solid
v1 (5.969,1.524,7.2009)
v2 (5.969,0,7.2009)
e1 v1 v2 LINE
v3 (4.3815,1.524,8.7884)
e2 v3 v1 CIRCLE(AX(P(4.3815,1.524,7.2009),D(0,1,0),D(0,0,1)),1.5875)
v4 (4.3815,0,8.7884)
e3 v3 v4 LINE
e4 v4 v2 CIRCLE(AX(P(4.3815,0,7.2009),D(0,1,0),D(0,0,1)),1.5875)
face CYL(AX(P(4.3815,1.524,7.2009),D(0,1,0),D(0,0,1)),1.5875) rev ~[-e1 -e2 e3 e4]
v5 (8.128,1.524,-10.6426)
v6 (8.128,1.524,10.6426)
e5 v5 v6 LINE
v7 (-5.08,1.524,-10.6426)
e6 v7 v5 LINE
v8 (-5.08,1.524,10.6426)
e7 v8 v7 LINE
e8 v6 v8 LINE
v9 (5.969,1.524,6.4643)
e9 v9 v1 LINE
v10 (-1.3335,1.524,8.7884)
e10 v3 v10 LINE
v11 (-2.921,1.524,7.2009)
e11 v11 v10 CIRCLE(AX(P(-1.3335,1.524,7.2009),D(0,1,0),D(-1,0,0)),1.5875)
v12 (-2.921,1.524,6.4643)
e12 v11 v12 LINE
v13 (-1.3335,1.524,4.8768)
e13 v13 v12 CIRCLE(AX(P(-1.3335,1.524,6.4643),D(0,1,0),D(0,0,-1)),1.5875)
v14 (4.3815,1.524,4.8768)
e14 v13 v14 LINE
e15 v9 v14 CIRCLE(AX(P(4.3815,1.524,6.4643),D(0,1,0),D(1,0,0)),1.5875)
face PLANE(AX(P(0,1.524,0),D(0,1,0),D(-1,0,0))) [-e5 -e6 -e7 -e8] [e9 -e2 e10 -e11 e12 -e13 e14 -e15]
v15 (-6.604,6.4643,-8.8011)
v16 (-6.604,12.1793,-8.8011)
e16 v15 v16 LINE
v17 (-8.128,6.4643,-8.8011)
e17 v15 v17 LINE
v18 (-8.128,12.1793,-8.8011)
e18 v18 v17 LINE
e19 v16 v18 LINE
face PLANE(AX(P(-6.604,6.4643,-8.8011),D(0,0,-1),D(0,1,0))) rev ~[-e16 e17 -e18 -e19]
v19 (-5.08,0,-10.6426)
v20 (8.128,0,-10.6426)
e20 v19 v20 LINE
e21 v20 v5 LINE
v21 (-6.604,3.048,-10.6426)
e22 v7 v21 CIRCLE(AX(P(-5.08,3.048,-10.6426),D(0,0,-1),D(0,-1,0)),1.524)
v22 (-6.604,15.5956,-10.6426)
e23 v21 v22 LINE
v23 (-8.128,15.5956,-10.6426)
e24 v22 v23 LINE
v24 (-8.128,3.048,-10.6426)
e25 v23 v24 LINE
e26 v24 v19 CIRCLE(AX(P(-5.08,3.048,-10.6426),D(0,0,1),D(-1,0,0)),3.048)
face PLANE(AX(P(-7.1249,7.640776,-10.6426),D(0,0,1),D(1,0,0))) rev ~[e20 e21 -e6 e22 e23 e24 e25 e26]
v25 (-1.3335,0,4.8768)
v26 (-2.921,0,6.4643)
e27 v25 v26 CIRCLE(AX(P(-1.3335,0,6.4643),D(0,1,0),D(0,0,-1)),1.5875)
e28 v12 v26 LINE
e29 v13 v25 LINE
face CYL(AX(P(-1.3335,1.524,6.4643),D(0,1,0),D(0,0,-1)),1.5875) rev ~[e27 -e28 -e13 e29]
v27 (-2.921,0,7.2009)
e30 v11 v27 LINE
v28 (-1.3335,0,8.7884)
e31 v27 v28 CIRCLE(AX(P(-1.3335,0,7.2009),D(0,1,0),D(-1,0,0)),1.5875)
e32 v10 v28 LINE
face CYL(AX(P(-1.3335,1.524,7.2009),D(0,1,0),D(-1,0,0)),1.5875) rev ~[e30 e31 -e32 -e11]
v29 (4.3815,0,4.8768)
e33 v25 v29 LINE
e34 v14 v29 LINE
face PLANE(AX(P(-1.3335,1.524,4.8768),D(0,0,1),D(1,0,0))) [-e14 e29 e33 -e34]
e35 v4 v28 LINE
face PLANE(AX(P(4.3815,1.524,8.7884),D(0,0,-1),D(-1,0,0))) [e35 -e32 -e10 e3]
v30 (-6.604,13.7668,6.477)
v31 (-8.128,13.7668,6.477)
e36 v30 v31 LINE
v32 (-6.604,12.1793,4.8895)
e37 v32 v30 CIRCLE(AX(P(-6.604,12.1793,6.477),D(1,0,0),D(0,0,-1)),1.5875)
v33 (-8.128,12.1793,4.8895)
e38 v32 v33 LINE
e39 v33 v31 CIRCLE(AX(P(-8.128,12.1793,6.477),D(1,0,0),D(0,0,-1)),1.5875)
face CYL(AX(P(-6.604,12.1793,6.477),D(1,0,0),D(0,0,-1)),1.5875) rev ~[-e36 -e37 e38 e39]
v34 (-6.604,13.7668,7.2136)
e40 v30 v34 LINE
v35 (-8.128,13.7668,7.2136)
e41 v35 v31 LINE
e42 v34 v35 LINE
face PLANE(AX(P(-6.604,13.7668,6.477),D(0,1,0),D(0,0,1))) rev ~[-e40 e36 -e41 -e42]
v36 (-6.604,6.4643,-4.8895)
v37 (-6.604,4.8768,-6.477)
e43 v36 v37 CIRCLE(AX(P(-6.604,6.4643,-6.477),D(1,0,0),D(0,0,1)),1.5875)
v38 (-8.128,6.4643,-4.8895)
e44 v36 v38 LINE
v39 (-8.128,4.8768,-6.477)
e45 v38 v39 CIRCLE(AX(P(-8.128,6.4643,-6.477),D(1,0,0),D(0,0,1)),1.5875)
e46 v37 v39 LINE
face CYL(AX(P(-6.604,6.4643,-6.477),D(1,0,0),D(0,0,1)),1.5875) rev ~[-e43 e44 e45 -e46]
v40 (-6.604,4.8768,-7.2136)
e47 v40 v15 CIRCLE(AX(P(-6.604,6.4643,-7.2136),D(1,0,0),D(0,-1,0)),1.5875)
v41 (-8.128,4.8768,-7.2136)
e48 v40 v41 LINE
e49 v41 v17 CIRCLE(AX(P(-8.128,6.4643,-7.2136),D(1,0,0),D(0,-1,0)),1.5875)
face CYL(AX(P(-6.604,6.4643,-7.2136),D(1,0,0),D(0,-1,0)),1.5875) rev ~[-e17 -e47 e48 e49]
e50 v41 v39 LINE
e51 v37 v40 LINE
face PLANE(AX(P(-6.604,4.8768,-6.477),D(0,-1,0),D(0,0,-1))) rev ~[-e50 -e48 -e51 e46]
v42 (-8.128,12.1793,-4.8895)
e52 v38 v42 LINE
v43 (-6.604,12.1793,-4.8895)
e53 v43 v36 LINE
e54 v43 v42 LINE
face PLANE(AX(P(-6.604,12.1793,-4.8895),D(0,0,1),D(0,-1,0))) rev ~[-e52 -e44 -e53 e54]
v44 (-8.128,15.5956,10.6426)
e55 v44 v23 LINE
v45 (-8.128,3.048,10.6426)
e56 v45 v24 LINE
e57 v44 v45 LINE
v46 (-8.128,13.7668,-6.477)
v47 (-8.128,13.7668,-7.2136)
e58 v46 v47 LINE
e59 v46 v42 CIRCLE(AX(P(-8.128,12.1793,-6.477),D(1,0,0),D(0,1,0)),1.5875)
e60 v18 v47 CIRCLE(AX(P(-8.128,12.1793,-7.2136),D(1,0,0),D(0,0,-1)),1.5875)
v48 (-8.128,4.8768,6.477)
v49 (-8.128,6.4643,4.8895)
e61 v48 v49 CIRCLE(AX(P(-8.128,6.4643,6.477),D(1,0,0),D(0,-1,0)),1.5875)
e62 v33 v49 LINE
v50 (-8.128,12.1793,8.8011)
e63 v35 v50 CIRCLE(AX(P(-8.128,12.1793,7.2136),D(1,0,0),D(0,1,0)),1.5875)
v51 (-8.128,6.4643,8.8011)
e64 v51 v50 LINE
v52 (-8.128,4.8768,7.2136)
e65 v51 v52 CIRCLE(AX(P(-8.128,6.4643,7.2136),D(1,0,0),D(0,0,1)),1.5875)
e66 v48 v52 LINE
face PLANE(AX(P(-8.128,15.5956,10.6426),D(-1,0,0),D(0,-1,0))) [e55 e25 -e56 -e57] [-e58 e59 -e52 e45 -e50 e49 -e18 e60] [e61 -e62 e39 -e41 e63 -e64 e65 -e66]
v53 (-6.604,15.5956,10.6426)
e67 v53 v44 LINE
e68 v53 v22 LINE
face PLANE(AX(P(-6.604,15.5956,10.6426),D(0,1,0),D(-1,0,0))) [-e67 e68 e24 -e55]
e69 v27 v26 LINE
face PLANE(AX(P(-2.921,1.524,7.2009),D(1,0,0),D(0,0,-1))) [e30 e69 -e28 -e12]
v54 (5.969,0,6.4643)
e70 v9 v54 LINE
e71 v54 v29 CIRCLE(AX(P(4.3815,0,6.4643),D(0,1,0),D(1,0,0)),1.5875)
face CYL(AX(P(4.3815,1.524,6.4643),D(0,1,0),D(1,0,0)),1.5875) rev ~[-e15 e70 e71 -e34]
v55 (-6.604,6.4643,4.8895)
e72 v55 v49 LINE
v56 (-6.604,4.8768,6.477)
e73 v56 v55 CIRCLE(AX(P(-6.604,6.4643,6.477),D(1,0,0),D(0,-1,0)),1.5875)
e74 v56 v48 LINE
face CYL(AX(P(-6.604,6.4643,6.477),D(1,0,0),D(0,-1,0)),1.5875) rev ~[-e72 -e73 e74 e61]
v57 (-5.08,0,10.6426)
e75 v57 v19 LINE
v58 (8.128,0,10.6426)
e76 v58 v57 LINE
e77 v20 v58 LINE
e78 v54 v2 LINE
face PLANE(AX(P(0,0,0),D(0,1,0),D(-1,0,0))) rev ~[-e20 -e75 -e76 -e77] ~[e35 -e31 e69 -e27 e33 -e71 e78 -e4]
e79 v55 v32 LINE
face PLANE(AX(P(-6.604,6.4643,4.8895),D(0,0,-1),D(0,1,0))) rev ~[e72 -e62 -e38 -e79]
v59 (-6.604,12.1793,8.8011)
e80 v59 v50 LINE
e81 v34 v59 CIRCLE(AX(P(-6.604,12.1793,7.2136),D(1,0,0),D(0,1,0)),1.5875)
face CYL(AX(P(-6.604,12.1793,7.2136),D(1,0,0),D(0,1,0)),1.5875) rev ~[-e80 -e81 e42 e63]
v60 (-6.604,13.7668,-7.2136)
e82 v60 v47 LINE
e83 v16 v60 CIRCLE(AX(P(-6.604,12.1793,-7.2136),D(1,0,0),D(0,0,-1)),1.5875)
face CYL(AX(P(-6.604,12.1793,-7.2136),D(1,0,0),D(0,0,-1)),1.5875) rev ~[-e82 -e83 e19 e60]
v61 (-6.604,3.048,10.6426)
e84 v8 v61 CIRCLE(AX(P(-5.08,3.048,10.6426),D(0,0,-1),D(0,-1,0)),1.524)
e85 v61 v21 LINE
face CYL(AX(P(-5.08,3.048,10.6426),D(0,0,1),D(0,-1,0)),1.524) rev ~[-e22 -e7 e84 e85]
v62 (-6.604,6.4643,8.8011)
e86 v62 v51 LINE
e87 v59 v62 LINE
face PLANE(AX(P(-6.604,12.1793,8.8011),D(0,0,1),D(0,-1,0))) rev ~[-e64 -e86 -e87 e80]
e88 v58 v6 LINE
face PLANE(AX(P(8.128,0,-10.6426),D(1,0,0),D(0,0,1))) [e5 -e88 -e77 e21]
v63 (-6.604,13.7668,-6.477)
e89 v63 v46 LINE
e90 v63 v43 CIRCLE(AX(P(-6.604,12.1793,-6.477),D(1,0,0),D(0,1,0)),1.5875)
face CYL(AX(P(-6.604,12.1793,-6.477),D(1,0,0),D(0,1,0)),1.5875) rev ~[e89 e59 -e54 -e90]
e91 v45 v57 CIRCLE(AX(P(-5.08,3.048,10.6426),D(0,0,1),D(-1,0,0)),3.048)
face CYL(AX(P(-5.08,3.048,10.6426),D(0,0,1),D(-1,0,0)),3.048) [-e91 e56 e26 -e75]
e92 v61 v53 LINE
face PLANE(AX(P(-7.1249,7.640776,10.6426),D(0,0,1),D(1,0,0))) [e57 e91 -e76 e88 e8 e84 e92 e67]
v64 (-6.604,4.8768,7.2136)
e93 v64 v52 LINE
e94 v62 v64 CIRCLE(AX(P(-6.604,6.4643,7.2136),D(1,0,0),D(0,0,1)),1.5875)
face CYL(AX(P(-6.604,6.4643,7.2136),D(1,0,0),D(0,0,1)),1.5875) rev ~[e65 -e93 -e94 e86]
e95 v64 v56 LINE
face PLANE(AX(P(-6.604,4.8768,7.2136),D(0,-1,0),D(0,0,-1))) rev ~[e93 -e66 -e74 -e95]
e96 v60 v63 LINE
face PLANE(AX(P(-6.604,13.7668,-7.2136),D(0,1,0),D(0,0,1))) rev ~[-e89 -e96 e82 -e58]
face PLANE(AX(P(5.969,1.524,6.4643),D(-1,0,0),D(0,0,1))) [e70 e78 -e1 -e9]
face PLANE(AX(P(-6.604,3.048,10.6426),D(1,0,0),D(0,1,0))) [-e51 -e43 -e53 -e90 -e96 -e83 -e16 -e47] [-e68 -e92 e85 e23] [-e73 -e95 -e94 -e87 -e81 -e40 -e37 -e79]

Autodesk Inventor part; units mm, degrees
ref_plane "YZ Plane" through (0, 0, 0) normal (1, 0, 0) x (0, 1, 0)
ref_plane "XZ Plane" through (0, 0, 0) normal (0, 1, 0) x (-1, 0, 0)
ref_plane "XY Plane" through (0, 0, 0) normal (0, 0, 1) x (1, 0, 0)
sketch "Sketch1" plane through (0, 0, 0) normal (0, 1, 0) x (-1, 0, 0)
  line L0 (-8.128, 10.6426) -> (8.128, 10.6426)
  line L1 (8.128, 10.6426) -> (8.128, -10.6426)
  line L2 (8.128, -10.6426) -> (-8.128, -10.6426)
  line L3 (-8.128, -10.6426) -> (-8.128, 10.6426)
  line L4 (-8.128, 10.6426) -> (8.128, -10.6426) construction
  line L5 (8.128, 10.6426) -> (-8.128, -10.6426) construction
  point P0 (0, 0)
  dimension "d0" = 21.2852
  dimension "d1" = 16.256
extrude "Plate1" add sketch "Sketch1" along normal blind 1.524
sketch "Sketch2" plane through (-6.604, 0, 10.6426) normal (-1, 0, 0) x (0, -1, 0)
  line L0 (0, -21.2852) -> (0, 0)
  line L1 (0, 0) -> (-15.5956, 0)
  line L2 (-15.5956, 0) -> (-15.5956, -21.2852)
  line L3 (-15.5956, -21.2852) -> (0, -21.2852)
edge flange "Flange1" height 15.5956 angle 90 thickness 1.524 bend radius 1.524 thickness toward (-1, 0, 0) relief tear relief width 1.524 relief depth 0.762 edges at (-8.128, 1.524, 0) wall of the first edge with corners at (-6.604, 0, -10.6426) (-6.604, 0, 10.6426) (-6.604, 15.5956, 10.6426) (-6.604, 15.5956, -10.6426)
bend "Bend1"
corner "Corner1"
sketch "Sketch3" plane through (-6.604, 15.5956, 10.6426) normal (1, 0, 0) x (0, 0, -1)
  line L0 (0, 0) -> (0, -12.5476) construction
  line L1 (21.2852, -12.5476) -> (21.2852, 0) construction
  circle A0 centre (3.7973, -6.2738) radius 1.5875 construction
  circle A1 centre (17.4879, -6.2738) radius 1.5875 construction
  line L2 (3.7973, -6.2738) -> (17.4879, -6.2738) construction
  line L3 (21.2852, 0) -> (0, 0) construction
  line L4 (10.6426, 0) -> (10.6426, -12.5476) construction
  line L5 (0, -12.5476) -> (21.2852, -12.5476) construction
  line L6 (17.1196, -10.7188) -> (17.8562, -10.7188)
  line L7 (19.4437, -9.1313) -> (19.4437, -3.4163)
  line L8 (17.8562, -1.8288) -> (17.1196, -1.8288)
  line L9 (15.5321, -3.4163) -> (15.5321, -9.1313)
  line L10 (15.5321, -10.7188) -> (19.4437, -1.8288) construction
  line L11 (19.4437, -10.7188) -> (15.5321, -1.8288) construction
  arc A2 (17.1196, -1.8288) -> (15.5321, -3.4163) centre (17.1196, -3.4163) ccw
  arc A3 (19.4437, -3.4163) -> (17.8562, -1.8288) centre (17.8562, -3.4163) ccw
  arc A4 (15.5321, -9.1313) -> (17.1196, -10.7188) centre (17.1196, -9.1313) ccw
  arc A5 (17.8562, -10.7188) -> (19.4437, -9.1313) centre (17.8562, -9.1313) ccw
  line L12 (3.429, -10.7188) -> (4.1656, -10.7188)
  line L13 (5.7531, -9.1313) -> (5.7531, -3.4163)
  line L14 (4.1656, -1.8288) -> (3.429, -1.8288)
  line L15 (1.8415, -3.4163) -> (1.8415, -9.1313)
  line L16 (1.8415, -10.7188) -> (5.7531, -1.8288) construction
  line L17 (5.7531, -10.7188) -> (1.8415, -1.8288) construction
  arc A6 (3.429, -1.8288) -> (1.8415, -3.4163) centre (3.429, -3.4163) ccw
  arc A7 (5.7531, -3.4163) -> (4.1656, -1.8288) centre (4.1656, -3.4163) ccw
  arc A8 (4.1656, -10.7188) -> (5.7531, -9.1313) centre (4.1656, -9.1313) ccw
  arc A9 (1.8415, -9.1313) -> (3.429, -10.7188) centre (3.429, -9.1313) ccw
  point P0 (10.6426, -15.5956)
  point P1 (10.6426, -6.2738)
  dimension "d13" = 13.6906
  dimension "d14" = 3.175
  dimension "d15" = 3.175
  dimension "d16" = 3.9116
  dimension "d17" = 8.89
  dimension "d18" = 1.5875
  dimension "d19" = 3.9116
  dimension "d20" = 8.89
  dimension "d21" = 1.5875
sketch "Sketch4" plane through (0, 1.524, 0) normal (0, 1, 0) x (1, 0, 0)
  line L0 (-5.08, 10.6426) -> (8.128, 10.6426) construction
  line L1 (4.3815, 4.8768) -> (-1.3335, 4.8768) construction
  line L2 (-2.921, 6.4643) -> (-2.921, 7.2009) construction
  line L3 (-1.3335, 8.7884) -> (4.3815, 8.7884) construction
  line L4 (5.969, 7.2009) -> (5.969, 6.4643) construction
  arc A0 (-2.921, 6.4643) -> (-1.3335, 4.8768) centre (-1.3335, 6.4643) ccw construction
  arc A1 (-1.3335, 8.7884) -> (-2.921, 7.2009) centre (-1.3335, 7.2009) ccw construction
  arc A2 (4.3815, 4.8768) -> (5.969, 6.4643) centre (4.3815, 6.4643) ccw construction
  arc A3 (5.969, 7.2009) -> (4.3815, 8.7884) centre (4.3815, 7.2009) ccw construction
  line L5 (8.128, 10.6426) -> (8.128, -10.6426) projected
  line L6 (1.524, 4.8768) -> (1.524, 8.7884) construction
  line L7 (4.3815, -8.7884) -> (-1.3335, -8.7884)
  line L8 (-2.921, -7.2009) -> (-2.921, -6.4643)
  line L9 (-1.3335, -4.8768) -> (4.3815, -4.8768)
  line L10 (5.969, -6.4643) -> (5.969, -7.2009)
  arc A4 (-2.921, -7.2009) -> (-1.3335, -8.7884) centre (-1.3335, -7.2009) ccw
  arc A5 (-1.3335, -4.8768) -> (-2.921, -6.4643) centre (-1.3335, -6.4643) ccw
  arc A6 (4.3815, -8.7884) -> (5.969, -7.2009) centre (4.3815, -7.2009) ccw
  arc A7 (5.969, -6.4643) -> (4.3815, -4.8768) centre (4.3815, -6.4643) ccw
  line L11 (1.524, -8.7884) -> (1.524, -4.8768) construction
  line L12 (8.128, -10.6426) -> (-5.08, -10.6426) construction
  point P0 (0, 0)
  point P1 (1.524, 6.8326)
  point P2 (1.524, -6.8326)
  dimension "d26" = 1.5875
  dimension "d32" = 3.9116
  dimension "d33" = 8.89
  dimension "d34" = 6.604
  dimension "d35" = 3.81
  dimension "d36" = 1.5875
  dimension "d37" = 3.9116
  dimension "d38" = 8.89
  dimension "d39" = 3.81
  dimension "d40" = 6.604
extrude "Extrusion1" cut sketch "Sketch3" against normal through all
extrude "Extrusion3" cut sketch "Sketch4" against normal through all
equation "\"d3\" = BendReliefWidth"
equation "\"d4\" = BendReliefDepth"
equation "\"d5\" = MinimumRemnant"
equation "\"d6\" = BendRadius"
equation "\"d9\" = BendRadius"
equation "\"d10\" = CornerReliefSize"
equation "\"d11\" = GapSize"
equation "\"d12\" = JacobiRadiusSize"
equation "\"BendRadius\" = Thickness"
equation "\"BendReliefWidth\" = Thickness"
equation "\"BendReliefDepth\" = 0.5 * Thickness"
equation "\"CornerReliefSize\" = 4 * Thickness"
equation "\"MinimumRemnant\" = 2 * Thickness"
equation "\"TransitionRadius\" = BendRadius"
equation "\"JacobiRadiusSize\" = BendRadius"
equation "\"GapSize\" = Thickness"
equation "\"d2\" = BendRadius"
equation "\"Thickness\" = 1.524"
properties part number "mezzanineBracketLeft"
